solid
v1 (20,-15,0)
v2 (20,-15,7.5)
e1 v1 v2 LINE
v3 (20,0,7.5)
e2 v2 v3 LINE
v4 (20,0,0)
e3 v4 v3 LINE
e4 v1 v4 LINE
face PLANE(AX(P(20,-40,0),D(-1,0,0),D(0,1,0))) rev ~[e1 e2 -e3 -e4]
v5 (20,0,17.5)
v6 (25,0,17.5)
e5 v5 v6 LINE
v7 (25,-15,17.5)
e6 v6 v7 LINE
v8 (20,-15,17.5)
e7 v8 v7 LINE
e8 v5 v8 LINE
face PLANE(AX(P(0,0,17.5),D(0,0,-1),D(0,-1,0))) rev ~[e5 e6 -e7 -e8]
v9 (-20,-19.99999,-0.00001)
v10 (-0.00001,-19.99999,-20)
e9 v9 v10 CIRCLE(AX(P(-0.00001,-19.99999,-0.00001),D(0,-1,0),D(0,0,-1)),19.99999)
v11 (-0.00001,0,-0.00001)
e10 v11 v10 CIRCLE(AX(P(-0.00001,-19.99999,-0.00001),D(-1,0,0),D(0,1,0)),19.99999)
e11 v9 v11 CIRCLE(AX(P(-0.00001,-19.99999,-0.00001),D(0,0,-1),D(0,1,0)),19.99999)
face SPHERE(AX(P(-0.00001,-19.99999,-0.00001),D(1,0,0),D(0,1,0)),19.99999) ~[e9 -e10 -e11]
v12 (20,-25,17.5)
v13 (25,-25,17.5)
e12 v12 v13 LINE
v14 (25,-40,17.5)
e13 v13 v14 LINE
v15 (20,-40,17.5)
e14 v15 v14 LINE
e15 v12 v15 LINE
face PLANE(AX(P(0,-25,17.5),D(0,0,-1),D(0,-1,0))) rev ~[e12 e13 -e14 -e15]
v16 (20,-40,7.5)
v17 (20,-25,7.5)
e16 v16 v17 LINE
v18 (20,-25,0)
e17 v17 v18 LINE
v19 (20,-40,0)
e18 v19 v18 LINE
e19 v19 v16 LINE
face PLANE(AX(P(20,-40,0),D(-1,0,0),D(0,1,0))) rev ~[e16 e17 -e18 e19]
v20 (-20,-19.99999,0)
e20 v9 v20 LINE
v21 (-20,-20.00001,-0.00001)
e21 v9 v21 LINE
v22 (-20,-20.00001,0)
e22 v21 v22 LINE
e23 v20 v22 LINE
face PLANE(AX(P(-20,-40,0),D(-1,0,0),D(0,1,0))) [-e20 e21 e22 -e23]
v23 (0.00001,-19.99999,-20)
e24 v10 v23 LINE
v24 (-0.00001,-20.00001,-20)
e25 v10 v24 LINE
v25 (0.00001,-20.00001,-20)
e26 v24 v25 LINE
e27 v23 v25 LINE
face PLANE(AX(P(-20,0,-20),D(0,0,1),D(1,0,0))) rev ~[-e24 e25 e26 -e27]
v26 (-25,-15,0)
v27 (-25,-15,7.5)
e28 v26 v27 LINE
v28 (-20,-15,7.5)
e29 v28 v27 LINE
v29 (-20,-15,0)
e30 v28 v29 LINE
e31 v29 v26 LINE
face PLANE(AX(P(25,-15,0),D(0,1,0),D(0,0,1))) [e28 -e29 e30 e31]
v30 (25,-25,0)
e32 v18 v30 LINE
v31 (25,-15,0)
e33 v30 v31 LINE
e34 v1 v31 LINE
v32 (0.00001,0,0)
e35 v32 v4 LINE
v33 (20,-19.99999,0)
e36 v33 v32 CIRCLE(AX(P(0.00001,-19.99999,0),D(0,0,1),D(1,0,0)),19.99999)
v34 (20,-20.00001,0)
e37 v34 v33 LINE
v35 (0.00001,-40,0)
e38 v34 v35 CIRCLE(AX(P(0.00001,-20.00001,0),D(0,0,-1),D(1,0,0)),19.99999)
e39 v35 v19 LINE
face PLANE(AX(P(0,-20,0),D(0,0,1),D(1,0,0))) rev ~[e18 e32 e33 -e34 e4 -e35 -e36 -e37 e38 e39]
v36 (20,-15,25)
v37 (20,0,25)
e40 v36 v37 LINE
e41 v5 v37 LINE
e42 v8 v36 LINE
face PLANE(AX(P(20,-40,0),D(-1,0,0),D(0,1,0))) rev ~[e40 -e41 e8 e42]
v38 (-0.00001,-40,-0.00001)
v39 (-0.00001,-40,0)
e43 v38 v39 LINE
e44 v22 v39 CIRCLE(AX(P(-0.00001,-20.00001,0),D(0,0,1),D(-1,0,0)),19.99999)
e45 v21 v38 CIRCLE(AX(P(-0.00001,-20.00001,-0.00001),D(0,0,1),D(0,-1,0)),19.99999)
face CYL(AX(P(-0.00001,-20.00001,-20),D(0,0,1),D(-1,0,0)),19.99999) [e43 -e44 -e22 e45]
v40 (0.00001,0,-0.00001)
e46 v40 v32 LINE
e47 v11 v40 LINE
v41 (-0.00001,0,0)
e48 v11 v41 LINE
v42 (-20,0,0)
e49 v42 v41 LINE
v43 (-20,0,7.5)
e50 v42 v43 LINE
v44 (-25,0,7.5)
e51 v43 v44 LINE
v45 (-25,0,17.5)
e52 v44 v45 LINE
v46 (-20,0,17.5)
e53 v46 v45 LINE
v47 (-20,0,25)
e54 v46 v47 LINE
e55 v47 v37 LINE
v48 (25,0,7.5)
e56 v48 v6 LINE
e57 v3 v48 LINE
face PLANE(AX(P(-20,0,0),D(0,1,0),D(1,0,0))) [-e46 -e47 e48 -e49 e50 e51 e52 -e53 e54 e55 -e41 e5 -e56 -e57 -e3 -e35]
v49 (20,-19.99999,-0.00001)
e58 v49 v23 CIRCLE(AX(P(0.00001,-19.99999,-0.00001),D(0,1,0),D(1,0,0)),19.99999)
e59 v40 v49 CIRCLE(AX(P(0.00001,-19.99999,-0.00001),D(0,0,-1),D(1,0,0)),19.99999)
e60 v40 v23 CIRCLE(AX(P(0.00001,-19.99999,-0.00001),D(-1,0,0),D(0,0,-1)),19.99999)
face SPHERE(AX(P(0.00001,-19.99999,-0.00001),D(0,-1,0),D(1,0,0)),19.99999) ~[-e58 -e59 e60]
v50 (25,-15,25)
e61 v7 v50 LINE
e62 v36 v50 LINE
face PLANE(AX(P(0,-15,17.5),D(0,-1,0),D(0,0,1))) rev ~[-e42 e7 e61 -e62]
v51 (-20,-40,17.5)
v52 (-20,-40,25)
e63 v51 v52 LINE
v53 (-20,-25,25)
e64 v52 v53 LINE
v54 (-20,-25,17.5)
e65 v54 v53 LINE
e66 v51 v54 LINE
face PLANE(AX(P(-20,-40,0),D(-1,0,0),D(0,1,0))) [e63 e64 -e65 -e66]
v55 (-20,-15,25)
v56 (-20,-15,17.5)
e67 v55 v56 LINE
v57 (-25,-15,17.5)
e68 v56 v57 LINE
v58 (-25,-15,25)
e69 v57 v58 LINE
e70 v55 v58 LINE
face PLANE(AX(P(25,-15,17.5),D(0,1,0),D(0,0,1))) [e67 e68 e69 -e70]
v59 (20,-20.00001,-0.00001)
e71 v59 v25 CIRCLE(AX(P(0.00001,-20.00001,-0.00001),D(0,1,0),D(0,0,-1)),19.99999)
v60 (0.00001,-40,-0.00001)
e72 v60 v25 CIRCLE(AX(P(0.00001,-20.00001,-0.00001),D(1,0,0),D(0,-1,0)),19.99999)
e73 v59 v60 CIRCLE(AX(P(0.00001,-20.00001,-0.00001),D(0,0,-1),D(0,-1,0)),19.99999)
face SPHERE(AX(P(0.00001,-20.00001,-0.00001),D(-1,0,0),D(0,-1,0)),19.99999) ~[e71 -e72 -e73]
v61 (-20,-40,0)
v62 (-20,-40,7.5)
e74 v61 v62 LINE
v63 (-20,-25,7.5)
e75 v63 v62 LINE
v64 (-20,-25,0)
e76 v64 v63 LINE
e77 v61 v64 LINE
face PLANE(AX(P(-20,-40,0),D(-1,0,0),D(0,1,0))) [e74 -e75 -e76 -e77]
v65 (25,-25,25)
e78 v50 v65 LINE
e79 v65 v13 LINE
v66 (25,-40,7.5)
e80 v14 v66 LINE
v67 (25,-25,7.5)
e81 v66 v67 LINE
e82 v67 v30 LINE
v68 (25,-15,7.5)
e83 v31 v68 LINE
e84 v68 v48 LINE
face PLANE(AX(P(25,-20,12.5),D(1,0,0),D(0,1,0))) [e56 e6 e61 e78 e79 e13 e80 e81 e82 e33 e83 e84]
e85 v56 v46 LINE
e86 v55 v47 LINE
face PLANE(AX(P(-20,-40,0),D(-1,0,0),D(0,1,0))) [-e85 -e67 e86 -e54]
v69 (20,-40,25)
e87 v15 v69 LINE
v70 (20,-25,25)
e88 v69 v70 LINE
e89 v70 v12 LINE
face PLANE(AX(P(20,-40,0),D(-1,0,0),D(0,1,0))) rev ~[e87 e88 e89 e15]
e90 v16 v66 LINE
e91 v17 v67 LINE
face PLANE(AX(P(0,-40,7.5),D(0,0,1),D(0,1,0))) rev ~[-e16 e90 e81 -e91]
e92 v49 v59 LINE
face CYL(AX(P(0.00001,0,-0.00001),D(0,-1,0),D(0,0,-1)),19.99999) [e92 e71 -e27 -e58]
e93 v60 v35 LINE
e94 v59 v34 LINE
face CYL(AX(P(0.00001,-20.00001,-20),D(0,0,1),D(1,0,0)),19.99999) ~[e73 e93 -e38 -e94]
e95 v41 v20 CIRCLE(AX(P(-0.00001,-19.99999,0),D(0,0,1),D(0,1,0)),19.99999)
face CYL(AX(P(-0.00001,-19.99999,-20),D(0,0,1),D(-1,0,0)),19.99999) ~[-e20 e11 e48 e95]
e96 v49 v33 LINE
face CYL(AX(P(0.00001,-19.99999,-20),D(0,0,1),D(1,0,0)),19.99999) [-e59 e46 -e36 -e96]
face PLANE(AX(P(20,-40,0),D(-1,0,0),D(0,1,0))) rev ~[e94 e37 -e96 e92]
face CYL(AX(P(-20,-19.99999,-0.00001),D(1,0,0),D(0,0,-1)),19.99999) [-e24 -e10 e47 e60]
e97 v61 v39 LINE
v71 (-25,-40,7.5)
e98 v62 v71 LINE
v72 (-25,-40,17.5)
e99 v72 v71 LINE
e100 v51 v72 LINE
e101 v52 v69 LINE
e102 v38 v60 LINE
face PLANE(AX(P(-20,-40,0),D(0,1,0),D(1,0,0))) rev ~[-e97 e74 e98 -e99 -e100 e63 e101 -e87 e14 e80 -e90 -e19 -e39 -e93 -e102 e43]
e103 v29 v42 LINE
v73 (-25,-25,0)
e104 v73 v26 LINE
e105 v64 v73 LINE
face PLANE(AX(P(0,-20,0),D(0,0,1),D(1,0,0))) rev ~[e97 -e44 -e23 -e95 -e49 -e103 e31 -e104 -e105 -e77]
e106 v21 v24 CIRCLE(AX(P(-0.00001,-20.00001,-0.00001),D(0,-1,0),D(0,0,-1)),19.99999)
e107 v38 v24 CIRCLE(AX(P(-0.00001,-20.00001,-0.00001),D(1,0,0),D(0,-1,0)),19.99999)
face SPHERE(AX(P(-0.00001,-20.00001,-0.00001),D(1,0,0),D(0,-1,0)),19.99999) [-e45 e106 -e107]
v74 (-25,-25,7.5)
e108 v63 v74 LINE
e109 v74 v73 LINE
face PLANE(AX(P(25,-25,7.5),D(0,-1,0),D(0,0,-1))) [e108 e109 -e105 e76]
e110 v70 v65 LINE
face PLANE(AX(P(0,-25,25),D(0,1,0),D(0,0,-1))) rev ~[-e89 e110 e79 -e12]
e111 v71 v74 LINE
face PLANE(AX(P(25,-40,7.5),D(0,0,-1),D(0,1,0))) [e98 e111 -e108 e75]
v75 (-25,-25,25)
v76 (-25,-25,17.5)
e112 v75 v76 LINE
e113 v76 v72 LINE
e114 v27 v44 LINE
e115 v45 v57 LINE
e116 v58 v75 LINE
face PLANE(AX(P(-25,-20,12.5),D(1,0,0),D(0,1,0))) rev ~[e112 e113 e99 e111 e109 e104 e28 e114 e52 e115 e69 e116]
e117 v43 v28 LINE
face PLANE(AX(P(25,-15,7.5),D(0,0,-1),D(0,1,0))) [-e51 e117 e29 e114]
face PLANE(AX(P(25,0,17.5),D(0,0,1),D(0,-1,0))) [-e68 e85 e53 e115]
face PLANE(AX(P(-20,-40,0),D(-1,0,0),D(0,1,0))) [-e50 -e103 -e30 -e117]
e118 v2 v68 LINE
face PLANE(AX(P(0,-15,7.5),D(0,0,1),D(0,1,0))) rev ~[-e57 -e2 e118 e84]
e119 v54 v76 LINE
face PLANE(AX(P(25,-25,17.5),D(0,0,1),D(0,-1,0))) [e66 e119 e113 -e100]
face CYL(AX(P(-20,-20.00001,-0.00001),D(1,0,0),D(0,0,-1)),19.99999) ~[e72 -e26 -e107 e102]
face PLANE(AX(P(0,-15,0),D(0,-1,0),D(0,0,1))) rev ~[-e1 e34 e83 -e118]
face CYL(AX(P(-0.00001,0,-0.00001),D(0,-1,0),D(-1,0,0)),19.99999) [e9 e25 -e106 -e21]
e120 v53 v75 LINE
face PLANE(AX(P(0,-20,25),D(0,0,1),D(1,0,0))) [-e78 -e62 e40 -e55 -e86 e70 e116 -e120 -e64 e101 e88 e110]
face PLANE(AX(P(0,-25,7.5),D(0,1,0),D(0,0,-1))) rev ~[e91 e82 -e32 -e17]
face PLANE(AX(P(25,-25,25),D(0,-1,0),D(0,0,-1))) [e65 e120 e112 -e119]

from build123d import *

# Parameters (mm, degrees)
F0_W     = 40
F0_H     = 40
F1_DEPTH = 40
F2_R     = 19.99999
F3_W     = 40
F3_H     = 40
F4_DEPTH = 25
F6_DEPTH = 25
F7_DEPTH = 50


# Not quite as in the source:
# - a fillet or chamfer is up to 0.001 mm smaller than in the source, because OpenCascade refuses the exact size


with BuildPart() as f1:
    # F0 (on Front) → F1 (new body)
    with BuildSketch(Plane.XZ):
        Rectangle(F0_W, F0_H)
    extrude(amount=F1_DEPTH)

    # F2 (radius 20 in the source; OpenCascade refuses exactly that, so slightly less here)
    f2_edges = [f1.edges().sort_by_distance(p)[0] for p in [
        (20, -20, 20),
        (-20, -20, 20),
        (0, 0, 20),
        (0, -40, 20),
        (0, -40, -20),
        (20, -40, 0),
        (-20, -40, 0),
        (20, -20, -20),
        (20, 0, 0),
        (0, 0, -20),
        (-20, 0, 0),
        (-20, -20, -20),
    ]]
    fillet(f2_edges, radius=F2_R)

    # F3 (on Top) → F4 (join)
    with BuildSketch(Plane.XY):
        with Locations((0, -20)):
            Rectangle(F3_W, F3_H)
    extrude(amount=F4_DEPTH)

    # F5 (on Right) → F6 (join)
    with BuildSketch(Plane.YZ):
        Polygon((-25, 0), (-20, 0), (-15, 0), (-15, 7.5), (0, 7.5), (0, 17.5), (-15, 17.5), (-15, 25), (-25, 25), (-25, 17.5), (-40, 17.5), (-40, 7.5), (-25, 7.5), align=None)
    extrude(amount=F6_DEPTH)

    # F7 (add): a face of the model
    f7_faces = [f1.faces().sort_by_distance(p)[0] for p in [
        (25, -20, 12.5),
    ]]
    extrude(f7_faces, amount=-F7_DEPTH)


solid = f1.part
